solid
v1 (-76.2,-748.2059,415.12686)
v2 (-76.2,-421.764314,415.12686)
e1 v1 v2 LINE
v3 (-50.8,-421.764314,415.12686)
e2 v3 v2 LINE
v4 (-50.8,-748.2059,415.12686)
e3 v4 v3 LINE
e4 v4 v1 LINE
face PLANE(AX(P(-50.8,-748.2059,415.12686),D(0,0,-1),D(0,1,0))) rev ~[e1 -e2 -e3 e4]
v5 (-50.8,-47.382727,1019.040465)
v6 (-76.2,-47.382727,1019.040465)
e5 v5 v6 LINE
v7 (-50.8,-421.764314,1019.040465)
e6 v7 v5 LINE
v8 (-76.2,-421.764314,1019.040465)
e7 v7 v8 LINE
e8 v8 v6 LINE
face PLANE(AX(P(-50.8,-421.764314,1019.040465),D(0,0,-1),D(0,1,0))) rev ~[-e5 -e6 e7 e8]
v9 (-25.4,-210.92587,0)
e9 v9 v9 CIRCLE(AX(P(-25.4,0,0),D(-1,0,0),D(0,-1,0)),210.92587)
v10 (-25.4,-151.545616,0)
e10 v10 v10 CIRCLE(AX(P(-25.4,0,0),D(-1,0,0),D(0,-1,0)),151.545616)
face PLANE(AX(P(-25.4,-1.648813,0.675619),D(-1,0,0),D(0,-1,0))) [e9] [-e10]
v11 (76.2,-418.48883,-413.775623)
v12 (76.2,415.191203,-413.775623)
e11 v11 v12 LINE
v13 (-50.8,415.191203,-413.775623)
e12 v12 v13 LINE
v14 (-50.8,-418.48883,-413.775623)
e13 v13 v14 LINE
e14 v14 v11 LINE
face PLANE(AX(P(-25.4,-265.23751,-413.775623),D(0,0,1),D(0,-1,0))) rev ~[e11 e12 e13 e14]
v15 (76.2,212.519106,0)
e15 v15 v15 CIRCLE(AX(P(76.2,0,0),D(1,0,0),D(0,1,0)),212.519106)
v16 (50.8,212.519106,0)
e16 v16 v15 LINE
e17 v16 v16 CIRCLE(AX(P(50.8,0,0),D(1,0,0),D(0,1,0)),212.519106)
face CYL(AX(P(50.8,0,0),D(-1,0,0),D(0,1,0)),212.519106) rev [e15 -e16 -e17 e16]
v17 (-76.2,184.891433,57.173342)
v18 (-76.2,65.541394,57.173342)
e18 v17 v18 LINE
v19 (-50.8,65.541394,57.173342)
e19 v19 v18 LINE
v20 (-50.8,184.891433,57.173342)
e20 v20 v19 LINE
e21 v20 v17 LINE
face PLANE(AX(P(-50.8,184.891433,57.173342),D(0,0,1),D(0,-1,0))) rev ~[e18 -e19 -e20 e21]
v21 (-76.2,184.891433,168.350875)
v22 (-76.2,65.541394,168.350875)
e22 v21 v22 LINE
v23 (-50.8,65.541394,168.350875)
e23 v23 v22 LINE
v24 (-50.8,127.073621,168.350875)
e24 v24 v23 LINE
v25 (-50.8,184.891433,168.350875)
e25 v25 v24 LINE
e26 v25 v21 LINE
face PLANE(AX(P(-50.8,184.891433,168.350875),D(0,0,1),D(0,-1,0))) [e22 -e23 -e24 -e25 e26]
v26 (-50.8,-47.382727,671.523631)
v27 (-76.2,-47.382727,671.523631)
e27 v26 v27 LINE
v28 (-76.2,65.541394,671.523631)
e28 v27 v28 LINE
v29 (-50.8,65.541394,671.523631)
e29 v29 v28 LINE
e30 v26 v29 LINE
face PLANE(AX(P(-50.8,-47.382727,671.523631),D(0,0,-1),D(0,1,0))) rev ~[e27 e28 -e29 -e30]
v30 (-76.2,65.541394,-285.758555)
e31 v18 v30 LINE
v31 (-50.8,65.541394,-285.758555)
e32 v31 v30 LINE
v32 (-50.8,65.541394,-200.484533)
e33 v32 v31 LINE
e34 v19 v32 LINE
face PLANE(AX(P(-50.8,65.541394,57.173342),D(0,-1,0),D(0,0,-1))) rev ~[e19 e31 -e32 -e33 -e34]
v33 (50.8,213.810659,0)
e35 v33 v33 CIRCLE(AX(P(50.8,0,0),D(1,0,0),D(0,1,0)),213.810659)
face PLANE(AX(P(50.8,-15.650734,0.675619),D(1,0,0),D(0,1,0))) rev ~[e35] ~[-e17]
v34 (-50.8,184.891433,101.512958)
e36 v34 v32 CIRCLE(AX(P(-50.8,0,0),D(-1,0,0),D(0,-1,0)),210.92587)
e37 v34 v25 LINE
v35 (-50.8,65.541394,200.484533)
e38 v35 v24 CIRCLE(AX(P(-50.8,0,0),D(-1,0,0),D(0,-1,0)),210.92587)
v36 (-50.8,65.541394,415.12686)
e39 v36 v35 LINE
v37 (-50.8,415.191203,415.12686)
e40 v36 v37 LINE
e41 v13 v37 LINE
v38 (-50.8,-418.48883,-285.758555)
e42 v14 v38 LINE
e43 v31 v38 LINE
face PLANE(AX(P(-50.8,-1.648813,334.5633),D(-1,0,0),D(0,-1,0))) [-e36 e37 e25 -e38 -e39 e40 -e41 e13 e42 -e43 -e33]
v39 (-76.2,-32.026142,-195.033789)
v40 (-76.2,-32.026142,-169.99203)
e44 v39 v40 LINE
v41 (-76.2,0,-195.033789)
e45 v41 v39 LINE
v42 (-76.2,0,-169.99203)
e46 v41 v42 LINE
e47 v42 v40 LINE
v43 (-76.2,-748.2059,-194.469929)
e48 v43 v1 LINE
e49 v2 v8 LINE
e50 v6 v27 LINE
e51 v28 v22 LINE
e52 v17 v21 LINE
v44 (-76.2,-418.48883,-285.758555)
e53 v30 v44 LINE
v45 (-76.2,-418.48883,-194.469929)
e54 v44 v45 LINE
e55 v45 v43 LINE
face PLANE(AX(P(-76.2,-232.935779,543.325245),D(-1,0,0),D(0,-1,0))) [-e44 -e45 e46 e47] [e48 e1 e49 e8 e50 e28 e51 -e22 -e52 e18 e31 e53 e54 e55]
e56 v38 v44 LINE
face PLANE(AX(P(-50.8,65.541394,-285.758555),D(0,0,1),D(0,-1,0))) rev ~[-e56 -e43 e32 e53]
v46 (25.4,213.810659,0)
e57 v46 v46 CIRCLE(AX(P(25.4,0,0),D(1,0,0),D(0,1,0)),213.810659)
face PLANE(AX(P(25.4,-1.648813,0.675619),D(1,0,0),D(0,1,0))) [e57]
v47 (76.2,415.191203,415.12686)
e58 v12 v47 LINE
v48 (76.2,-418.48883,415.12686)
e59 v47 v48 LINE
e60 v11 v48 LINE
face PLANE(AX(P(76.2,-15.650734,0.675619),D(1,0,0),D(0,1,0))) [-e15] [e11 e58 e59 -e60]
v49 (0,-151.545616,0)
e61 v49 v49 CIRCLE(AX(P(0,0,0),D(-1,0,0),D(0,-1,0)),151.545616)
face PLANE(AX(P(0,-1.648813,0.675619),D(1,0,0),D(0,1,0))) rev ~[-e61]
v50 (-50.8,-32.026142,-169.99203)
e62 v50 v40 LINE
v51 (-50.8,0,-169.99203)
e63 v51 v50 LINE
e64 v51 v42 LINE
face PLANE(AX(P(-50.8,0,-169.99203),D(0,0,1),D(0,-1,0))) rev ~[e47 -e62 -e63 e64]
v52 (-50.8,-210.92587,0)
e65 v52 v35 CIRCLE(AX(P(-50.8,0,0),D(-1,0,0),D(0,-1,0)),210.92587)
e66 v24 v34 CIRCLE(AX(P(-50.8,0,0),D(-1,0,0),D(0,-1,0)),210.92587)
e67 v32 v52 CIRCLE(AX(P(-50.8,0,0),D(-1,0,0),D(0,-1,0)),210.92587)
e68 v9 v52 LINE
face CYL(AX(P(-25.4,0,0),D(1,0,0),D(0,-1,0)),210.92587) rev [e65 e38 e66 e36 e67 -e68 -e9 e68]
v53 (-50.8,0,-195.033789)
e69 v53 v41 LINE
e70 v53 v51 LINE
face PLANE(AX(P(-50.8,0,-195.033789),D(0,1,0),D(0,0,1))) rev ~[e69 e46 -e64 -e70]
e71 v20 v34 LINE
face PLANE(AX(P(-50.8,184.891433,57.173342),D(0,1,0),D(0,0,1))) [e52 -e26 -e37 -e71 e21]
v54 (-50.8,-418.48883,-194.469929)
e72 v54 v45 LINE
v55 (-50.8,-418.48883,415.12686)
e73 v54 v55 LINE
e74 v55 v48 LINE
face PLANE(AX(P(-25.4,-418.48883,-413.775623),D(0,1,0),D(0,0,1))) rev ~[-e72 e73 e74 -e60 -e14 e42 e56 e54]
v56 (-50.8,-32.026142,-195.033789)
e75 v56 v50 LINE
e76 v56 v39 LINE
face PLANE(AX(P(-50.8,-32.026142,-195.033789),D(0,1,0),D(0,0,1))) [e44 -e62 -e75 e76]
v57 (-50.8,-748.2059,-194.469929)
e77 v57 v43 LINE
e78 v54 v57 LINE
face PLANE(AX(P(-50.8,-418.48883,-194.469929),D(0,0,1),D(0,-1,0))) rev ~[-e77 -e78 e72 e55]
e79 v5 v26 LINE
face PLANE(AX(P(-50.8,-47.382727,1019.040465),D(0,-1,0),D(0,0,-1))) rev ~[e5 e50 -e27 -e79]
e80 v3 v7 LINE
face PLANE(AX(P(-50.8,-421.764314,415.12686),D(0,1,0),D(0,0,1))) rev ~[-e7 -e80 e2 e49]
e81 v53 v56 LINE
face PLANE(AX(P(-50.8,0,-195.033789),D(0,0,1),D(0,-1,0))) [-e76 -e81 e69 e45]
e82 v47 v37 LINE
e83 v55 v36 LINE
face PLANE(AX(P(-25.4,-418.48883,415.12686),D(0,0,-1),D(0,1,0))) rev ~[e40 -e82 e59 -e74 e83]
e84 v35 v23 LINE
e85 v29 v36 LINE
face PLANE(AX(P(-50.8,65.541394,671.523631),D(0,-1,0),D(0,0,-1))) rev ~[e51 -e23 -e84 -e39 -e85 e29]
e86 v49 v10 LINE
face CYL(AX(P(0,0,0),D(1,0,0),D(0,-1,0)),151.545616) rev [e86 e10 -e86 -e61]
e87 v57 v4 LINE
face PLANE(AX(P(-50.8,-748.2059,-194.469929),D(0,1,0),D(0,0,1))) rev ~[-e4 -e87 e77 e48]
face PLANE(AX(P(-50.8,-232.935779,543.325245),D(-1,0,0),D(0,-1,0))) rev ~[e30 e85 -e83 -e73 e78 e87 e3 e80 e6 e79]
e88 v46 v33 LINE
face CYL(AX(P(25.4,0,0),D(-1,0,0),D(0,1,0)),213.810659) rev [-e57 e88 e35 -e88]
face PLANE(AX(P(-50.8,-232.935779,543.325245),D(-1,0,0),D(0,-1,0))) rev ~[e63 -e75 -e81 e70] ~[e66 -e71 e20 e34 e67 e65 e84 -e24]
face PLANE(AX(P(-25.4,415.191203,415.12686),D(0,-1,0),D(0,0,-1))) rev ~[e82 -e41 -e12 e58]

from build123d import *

# Parameters (mm, degrees)
F0_W      = 227.177798748
F0_H      = 67.4825310707
F0_W_2    = 7.6686143875
F0_W_3    = 40.7849550247
F0_H_2    = 19.1998630762
F1_DEPTH  = 25.4
F2_W      = 713.7889862061
F2_H      = 722.4479019642
F3_DEPTH  = 10751.3055801392
F5_W      = 833.6800336838
F5_H      = 828.9024829865
F6_DEPTH  = 25.4
F7_W      = 833.6800336838
F7_H      = 828.9024829865
F7_R      = 213.8106585198
F8_DEPTH  = 25.4
F9_W      = 805.6761920452
F9_H      = 828.9024829865
F9_R      = 212.5191058953
F9_W_2    = 28.0038416386
F10_DEPTH = 25.4
F11_W     = 833.6800336838
F11_H     = 828.9024829865
F11_R     = 151.5456161356
F12_DEPTH = 25.4
F13_W     = 680.4287135601
F13_H     = 667.77536273
F13_R     = 210.9258695705
F14_DEPTH = 25.4
F15_W     = 153.2513201237
F15_H     = 667.77536273
F16_DEPTH = 25.4
F17_W     = 371.1061030626
F17_H     = 256.3967704773
F17_W_2   = 32.0261418819
F17_H_2   = 25.0417590141
F17_W_3   = 119.3500384688
F17_H_3   = 111.177533865
F18_DEPTH = 25.4


with BuildPart() as f1:
    # F0 (on Right) → F1 (new body)
    with BuildSketch(Plane.YZ):
        Polygon((-598.1872081757, 183.7075799704), (-598.1872081757, 196.1238980293), (-605.8558225632, 196.1238980293), (-605.8558225632, 145.6781327724), (-598.1872081757, 145.6781327724), align=None)
        Polygon((-605.8558225632, 196.1238980293), (-598.1872081757, 196.1238980293), (-598.1872081757, 401.8925428391), (-605.8558225632, 401.8925428391), (-605.8558225632, 215.3237611055), align=None)
        Polygon((-1197.3617076874, 196.1238980293), (-605.8558225632, 196.1238980293), (-605.8558225632, 215.3237611055), (-1548.1258630753, 215.3237611055), (-1548.1258630753, 196.1238980293), align=None)
        Polygon((698.481798172, 183.7075799704), (-598.1872081757, 183.7075799704), (-598.1872081757, 145.6781327724), (-598.1872081757, 78.1956017017), (-598.1872081757, 8.7382793427), (698.481798172, 8.7382793427), align=None)
        Polygon((-1197.3617076874, 145.6781327724), (-1197.3617076874, 196.1238980293), (-1548.1258630753, 196.1238980293), (-1548.1258630753, 78.1956017017), (-833.0336213112, 78.1956017017), (-833.0336213112, 145.6781327724), align=None)
        with Locations((-719.4447219372, 111.9368672371)):
            Rectangle(F0_W, F0_H)
        with Locations((-602.0215153694, 111.9368672371)):
            Rectangle(F0_W_2, F0_H)
        Polygon((-1548.1258630753, 215.3237611055), (-605.8558225632, 215.3237611055), (-605.8558225632, 401.8925428391), (-1588.9108181, 401.8925428391), (-1588.9108181, 215.3237611055), align=None)
        with Locations((-1568.5183405876, 205.7238295674)):
            Rectangle(F0_W_3, F0_H_2)
    extrude(amount=F1_DEPTH)

    # F2 (on face) → F3 (join)
    with BuildSketch(Plane(origin=(0, 0, 0), x_dir=(0, -1, 0), z_dir=(-1, 0, 0))):
        with Locations((448.7802386284, 201.1957615614)):
            Rectangle(F2_W, F2_H)
    extrude(amount=F3_DEPTH)


with BuildPart() as f6:
    # F5 (on Right) → F6 (new body)
    with BuildSketch(Plane.YZ):
        with Locations((-1.6488134861, 0.6756186485)):
            Rectangle(F5_W, F5_H)
    extrude(amount=F6_DEPTH)

    # F7 (on face) → F8 (join)
    with BuildSketch(Plane.YZ.offset(25.4)):
        with Locations((-1.6488134861, 0.6756186485)):
            Rectangle(F7_W, F7_H)
        Circle(F7_R, mode=Mode.SUBTRACT)
    extrude(amount=F8_DEPTH)

    # F9 (on face) → F10 (join)
    with BuildSketch(Plane.YZ.offset(50.8)):
        with Locations((-15.6507343054, 0.6756186485)):
            Rectangle(F9_W, F9_H)
        Circle(F9_R, mode=Mode.SUBTRACT)
        with Locations((401.1892825365, 0.6756186485)):
            Rectangle(F9_W_2, F9_H)
    extrude(amount=F10_DEPTH)

    # F11 (on face) → F12 (join)
    with BuildSketch(Plane(origin=(0, 0, 0), x_dir=(0, -1, 0), z_dir=(-1, 0, 0))):
        with Locations((1.6488134861, 0.6756186485)):
            Rectangle(F11_W, F11_H)
        Circle(F11_R, mode=Mode.SUBTRACT)
    extrude(amount=F12_DEPTH)

    # F13 (on face) → F14 (join)
    with BuildSketch(Plane(origin=(-25.4, 0, 0), x_dir=(0, -1, 0), z_dir=(-1, 0, 0))):
        with Locations((-74.9768465757, -79.8879414797)):
            Rectangle(F13_W, F13_H)
        Circle(F13_R, mode=Mode.SUBTRACT)
    extrude(amount=F14_DEPTH)

    # F15 (on face) → F16 (join)
    with BuildSketch(Plane(origin=(-25.4, 0, 0), x_dir=(0, -1, 0), z_dir=(-1, 0, 0))):
        Polygon((418.488830328, 415.1268601418), (-415.1912033558, 415.1268601418), (-415.1912033558, 253.9997398853), (265.2375102043, 253.9997398853), (418.488830328, 253.9997398853), align=None)
        with Locations((341.8631702662, -79.8879414797)):
            Rectangle(F15_W, F15_H)
    extrude(amount=F16_DEPTH)

    # F17 (on face) → F18 (join)
    with BuildSketch(Plane(origin=(-50.8, 0, 0), x_dir=(0, -1, 0), z_dir=(-1, 0, 0))):
        with Locations((232.9357787967, 543.3252453804)):
            Rectangle(F17_W, F17_H)
        Polygon((418.488830328, 415.1268601418), (47.3827272654, 415.1268601418), (47.3827272654, 671.523630619), (-65.5413940549, 671.523630619), (-65.5413940549, 168.3508753777), (-65.5413940549, 57.1733415127), (-65.5413940549, -285.7585549355), (418.488830328, -285.7585549355), (418.488830328, -220.9893465042), (418.488830328, -194.4699287415), (418.488830328, 0.6756186485), align=None)
        with Locations((16.013070941, -182.512909174)):
            Rectangle(F17_W_2, F17_H_2, mode=Mode.SUBTRACT)
        Polygon((418.488830328, 671.523630619), (418.488830328, 415.1268601418), (421.7643141747, 415.1268601418), (421.7643141747, 1019.0404653549), (47.3827272654, 1019.0404653549), (47.3827272654, 671.523630619), align=None)
        Polygon((421.7643141747, 415.1268601418), (418.488830328, 415.1268601418), (418.488830328, 0.6756186485), (418.488830328, -194.4699287415), (748.2059001923, -194.4699287415), (748.2059001923, 415.1268601418), align=None)
        with Locations((-125.2164132893, 112.7621084452)):
            Rectangle(F17_W_3, F17_H_3)
    extrude(amount=F18_DEPTH)


solid = f6.part
